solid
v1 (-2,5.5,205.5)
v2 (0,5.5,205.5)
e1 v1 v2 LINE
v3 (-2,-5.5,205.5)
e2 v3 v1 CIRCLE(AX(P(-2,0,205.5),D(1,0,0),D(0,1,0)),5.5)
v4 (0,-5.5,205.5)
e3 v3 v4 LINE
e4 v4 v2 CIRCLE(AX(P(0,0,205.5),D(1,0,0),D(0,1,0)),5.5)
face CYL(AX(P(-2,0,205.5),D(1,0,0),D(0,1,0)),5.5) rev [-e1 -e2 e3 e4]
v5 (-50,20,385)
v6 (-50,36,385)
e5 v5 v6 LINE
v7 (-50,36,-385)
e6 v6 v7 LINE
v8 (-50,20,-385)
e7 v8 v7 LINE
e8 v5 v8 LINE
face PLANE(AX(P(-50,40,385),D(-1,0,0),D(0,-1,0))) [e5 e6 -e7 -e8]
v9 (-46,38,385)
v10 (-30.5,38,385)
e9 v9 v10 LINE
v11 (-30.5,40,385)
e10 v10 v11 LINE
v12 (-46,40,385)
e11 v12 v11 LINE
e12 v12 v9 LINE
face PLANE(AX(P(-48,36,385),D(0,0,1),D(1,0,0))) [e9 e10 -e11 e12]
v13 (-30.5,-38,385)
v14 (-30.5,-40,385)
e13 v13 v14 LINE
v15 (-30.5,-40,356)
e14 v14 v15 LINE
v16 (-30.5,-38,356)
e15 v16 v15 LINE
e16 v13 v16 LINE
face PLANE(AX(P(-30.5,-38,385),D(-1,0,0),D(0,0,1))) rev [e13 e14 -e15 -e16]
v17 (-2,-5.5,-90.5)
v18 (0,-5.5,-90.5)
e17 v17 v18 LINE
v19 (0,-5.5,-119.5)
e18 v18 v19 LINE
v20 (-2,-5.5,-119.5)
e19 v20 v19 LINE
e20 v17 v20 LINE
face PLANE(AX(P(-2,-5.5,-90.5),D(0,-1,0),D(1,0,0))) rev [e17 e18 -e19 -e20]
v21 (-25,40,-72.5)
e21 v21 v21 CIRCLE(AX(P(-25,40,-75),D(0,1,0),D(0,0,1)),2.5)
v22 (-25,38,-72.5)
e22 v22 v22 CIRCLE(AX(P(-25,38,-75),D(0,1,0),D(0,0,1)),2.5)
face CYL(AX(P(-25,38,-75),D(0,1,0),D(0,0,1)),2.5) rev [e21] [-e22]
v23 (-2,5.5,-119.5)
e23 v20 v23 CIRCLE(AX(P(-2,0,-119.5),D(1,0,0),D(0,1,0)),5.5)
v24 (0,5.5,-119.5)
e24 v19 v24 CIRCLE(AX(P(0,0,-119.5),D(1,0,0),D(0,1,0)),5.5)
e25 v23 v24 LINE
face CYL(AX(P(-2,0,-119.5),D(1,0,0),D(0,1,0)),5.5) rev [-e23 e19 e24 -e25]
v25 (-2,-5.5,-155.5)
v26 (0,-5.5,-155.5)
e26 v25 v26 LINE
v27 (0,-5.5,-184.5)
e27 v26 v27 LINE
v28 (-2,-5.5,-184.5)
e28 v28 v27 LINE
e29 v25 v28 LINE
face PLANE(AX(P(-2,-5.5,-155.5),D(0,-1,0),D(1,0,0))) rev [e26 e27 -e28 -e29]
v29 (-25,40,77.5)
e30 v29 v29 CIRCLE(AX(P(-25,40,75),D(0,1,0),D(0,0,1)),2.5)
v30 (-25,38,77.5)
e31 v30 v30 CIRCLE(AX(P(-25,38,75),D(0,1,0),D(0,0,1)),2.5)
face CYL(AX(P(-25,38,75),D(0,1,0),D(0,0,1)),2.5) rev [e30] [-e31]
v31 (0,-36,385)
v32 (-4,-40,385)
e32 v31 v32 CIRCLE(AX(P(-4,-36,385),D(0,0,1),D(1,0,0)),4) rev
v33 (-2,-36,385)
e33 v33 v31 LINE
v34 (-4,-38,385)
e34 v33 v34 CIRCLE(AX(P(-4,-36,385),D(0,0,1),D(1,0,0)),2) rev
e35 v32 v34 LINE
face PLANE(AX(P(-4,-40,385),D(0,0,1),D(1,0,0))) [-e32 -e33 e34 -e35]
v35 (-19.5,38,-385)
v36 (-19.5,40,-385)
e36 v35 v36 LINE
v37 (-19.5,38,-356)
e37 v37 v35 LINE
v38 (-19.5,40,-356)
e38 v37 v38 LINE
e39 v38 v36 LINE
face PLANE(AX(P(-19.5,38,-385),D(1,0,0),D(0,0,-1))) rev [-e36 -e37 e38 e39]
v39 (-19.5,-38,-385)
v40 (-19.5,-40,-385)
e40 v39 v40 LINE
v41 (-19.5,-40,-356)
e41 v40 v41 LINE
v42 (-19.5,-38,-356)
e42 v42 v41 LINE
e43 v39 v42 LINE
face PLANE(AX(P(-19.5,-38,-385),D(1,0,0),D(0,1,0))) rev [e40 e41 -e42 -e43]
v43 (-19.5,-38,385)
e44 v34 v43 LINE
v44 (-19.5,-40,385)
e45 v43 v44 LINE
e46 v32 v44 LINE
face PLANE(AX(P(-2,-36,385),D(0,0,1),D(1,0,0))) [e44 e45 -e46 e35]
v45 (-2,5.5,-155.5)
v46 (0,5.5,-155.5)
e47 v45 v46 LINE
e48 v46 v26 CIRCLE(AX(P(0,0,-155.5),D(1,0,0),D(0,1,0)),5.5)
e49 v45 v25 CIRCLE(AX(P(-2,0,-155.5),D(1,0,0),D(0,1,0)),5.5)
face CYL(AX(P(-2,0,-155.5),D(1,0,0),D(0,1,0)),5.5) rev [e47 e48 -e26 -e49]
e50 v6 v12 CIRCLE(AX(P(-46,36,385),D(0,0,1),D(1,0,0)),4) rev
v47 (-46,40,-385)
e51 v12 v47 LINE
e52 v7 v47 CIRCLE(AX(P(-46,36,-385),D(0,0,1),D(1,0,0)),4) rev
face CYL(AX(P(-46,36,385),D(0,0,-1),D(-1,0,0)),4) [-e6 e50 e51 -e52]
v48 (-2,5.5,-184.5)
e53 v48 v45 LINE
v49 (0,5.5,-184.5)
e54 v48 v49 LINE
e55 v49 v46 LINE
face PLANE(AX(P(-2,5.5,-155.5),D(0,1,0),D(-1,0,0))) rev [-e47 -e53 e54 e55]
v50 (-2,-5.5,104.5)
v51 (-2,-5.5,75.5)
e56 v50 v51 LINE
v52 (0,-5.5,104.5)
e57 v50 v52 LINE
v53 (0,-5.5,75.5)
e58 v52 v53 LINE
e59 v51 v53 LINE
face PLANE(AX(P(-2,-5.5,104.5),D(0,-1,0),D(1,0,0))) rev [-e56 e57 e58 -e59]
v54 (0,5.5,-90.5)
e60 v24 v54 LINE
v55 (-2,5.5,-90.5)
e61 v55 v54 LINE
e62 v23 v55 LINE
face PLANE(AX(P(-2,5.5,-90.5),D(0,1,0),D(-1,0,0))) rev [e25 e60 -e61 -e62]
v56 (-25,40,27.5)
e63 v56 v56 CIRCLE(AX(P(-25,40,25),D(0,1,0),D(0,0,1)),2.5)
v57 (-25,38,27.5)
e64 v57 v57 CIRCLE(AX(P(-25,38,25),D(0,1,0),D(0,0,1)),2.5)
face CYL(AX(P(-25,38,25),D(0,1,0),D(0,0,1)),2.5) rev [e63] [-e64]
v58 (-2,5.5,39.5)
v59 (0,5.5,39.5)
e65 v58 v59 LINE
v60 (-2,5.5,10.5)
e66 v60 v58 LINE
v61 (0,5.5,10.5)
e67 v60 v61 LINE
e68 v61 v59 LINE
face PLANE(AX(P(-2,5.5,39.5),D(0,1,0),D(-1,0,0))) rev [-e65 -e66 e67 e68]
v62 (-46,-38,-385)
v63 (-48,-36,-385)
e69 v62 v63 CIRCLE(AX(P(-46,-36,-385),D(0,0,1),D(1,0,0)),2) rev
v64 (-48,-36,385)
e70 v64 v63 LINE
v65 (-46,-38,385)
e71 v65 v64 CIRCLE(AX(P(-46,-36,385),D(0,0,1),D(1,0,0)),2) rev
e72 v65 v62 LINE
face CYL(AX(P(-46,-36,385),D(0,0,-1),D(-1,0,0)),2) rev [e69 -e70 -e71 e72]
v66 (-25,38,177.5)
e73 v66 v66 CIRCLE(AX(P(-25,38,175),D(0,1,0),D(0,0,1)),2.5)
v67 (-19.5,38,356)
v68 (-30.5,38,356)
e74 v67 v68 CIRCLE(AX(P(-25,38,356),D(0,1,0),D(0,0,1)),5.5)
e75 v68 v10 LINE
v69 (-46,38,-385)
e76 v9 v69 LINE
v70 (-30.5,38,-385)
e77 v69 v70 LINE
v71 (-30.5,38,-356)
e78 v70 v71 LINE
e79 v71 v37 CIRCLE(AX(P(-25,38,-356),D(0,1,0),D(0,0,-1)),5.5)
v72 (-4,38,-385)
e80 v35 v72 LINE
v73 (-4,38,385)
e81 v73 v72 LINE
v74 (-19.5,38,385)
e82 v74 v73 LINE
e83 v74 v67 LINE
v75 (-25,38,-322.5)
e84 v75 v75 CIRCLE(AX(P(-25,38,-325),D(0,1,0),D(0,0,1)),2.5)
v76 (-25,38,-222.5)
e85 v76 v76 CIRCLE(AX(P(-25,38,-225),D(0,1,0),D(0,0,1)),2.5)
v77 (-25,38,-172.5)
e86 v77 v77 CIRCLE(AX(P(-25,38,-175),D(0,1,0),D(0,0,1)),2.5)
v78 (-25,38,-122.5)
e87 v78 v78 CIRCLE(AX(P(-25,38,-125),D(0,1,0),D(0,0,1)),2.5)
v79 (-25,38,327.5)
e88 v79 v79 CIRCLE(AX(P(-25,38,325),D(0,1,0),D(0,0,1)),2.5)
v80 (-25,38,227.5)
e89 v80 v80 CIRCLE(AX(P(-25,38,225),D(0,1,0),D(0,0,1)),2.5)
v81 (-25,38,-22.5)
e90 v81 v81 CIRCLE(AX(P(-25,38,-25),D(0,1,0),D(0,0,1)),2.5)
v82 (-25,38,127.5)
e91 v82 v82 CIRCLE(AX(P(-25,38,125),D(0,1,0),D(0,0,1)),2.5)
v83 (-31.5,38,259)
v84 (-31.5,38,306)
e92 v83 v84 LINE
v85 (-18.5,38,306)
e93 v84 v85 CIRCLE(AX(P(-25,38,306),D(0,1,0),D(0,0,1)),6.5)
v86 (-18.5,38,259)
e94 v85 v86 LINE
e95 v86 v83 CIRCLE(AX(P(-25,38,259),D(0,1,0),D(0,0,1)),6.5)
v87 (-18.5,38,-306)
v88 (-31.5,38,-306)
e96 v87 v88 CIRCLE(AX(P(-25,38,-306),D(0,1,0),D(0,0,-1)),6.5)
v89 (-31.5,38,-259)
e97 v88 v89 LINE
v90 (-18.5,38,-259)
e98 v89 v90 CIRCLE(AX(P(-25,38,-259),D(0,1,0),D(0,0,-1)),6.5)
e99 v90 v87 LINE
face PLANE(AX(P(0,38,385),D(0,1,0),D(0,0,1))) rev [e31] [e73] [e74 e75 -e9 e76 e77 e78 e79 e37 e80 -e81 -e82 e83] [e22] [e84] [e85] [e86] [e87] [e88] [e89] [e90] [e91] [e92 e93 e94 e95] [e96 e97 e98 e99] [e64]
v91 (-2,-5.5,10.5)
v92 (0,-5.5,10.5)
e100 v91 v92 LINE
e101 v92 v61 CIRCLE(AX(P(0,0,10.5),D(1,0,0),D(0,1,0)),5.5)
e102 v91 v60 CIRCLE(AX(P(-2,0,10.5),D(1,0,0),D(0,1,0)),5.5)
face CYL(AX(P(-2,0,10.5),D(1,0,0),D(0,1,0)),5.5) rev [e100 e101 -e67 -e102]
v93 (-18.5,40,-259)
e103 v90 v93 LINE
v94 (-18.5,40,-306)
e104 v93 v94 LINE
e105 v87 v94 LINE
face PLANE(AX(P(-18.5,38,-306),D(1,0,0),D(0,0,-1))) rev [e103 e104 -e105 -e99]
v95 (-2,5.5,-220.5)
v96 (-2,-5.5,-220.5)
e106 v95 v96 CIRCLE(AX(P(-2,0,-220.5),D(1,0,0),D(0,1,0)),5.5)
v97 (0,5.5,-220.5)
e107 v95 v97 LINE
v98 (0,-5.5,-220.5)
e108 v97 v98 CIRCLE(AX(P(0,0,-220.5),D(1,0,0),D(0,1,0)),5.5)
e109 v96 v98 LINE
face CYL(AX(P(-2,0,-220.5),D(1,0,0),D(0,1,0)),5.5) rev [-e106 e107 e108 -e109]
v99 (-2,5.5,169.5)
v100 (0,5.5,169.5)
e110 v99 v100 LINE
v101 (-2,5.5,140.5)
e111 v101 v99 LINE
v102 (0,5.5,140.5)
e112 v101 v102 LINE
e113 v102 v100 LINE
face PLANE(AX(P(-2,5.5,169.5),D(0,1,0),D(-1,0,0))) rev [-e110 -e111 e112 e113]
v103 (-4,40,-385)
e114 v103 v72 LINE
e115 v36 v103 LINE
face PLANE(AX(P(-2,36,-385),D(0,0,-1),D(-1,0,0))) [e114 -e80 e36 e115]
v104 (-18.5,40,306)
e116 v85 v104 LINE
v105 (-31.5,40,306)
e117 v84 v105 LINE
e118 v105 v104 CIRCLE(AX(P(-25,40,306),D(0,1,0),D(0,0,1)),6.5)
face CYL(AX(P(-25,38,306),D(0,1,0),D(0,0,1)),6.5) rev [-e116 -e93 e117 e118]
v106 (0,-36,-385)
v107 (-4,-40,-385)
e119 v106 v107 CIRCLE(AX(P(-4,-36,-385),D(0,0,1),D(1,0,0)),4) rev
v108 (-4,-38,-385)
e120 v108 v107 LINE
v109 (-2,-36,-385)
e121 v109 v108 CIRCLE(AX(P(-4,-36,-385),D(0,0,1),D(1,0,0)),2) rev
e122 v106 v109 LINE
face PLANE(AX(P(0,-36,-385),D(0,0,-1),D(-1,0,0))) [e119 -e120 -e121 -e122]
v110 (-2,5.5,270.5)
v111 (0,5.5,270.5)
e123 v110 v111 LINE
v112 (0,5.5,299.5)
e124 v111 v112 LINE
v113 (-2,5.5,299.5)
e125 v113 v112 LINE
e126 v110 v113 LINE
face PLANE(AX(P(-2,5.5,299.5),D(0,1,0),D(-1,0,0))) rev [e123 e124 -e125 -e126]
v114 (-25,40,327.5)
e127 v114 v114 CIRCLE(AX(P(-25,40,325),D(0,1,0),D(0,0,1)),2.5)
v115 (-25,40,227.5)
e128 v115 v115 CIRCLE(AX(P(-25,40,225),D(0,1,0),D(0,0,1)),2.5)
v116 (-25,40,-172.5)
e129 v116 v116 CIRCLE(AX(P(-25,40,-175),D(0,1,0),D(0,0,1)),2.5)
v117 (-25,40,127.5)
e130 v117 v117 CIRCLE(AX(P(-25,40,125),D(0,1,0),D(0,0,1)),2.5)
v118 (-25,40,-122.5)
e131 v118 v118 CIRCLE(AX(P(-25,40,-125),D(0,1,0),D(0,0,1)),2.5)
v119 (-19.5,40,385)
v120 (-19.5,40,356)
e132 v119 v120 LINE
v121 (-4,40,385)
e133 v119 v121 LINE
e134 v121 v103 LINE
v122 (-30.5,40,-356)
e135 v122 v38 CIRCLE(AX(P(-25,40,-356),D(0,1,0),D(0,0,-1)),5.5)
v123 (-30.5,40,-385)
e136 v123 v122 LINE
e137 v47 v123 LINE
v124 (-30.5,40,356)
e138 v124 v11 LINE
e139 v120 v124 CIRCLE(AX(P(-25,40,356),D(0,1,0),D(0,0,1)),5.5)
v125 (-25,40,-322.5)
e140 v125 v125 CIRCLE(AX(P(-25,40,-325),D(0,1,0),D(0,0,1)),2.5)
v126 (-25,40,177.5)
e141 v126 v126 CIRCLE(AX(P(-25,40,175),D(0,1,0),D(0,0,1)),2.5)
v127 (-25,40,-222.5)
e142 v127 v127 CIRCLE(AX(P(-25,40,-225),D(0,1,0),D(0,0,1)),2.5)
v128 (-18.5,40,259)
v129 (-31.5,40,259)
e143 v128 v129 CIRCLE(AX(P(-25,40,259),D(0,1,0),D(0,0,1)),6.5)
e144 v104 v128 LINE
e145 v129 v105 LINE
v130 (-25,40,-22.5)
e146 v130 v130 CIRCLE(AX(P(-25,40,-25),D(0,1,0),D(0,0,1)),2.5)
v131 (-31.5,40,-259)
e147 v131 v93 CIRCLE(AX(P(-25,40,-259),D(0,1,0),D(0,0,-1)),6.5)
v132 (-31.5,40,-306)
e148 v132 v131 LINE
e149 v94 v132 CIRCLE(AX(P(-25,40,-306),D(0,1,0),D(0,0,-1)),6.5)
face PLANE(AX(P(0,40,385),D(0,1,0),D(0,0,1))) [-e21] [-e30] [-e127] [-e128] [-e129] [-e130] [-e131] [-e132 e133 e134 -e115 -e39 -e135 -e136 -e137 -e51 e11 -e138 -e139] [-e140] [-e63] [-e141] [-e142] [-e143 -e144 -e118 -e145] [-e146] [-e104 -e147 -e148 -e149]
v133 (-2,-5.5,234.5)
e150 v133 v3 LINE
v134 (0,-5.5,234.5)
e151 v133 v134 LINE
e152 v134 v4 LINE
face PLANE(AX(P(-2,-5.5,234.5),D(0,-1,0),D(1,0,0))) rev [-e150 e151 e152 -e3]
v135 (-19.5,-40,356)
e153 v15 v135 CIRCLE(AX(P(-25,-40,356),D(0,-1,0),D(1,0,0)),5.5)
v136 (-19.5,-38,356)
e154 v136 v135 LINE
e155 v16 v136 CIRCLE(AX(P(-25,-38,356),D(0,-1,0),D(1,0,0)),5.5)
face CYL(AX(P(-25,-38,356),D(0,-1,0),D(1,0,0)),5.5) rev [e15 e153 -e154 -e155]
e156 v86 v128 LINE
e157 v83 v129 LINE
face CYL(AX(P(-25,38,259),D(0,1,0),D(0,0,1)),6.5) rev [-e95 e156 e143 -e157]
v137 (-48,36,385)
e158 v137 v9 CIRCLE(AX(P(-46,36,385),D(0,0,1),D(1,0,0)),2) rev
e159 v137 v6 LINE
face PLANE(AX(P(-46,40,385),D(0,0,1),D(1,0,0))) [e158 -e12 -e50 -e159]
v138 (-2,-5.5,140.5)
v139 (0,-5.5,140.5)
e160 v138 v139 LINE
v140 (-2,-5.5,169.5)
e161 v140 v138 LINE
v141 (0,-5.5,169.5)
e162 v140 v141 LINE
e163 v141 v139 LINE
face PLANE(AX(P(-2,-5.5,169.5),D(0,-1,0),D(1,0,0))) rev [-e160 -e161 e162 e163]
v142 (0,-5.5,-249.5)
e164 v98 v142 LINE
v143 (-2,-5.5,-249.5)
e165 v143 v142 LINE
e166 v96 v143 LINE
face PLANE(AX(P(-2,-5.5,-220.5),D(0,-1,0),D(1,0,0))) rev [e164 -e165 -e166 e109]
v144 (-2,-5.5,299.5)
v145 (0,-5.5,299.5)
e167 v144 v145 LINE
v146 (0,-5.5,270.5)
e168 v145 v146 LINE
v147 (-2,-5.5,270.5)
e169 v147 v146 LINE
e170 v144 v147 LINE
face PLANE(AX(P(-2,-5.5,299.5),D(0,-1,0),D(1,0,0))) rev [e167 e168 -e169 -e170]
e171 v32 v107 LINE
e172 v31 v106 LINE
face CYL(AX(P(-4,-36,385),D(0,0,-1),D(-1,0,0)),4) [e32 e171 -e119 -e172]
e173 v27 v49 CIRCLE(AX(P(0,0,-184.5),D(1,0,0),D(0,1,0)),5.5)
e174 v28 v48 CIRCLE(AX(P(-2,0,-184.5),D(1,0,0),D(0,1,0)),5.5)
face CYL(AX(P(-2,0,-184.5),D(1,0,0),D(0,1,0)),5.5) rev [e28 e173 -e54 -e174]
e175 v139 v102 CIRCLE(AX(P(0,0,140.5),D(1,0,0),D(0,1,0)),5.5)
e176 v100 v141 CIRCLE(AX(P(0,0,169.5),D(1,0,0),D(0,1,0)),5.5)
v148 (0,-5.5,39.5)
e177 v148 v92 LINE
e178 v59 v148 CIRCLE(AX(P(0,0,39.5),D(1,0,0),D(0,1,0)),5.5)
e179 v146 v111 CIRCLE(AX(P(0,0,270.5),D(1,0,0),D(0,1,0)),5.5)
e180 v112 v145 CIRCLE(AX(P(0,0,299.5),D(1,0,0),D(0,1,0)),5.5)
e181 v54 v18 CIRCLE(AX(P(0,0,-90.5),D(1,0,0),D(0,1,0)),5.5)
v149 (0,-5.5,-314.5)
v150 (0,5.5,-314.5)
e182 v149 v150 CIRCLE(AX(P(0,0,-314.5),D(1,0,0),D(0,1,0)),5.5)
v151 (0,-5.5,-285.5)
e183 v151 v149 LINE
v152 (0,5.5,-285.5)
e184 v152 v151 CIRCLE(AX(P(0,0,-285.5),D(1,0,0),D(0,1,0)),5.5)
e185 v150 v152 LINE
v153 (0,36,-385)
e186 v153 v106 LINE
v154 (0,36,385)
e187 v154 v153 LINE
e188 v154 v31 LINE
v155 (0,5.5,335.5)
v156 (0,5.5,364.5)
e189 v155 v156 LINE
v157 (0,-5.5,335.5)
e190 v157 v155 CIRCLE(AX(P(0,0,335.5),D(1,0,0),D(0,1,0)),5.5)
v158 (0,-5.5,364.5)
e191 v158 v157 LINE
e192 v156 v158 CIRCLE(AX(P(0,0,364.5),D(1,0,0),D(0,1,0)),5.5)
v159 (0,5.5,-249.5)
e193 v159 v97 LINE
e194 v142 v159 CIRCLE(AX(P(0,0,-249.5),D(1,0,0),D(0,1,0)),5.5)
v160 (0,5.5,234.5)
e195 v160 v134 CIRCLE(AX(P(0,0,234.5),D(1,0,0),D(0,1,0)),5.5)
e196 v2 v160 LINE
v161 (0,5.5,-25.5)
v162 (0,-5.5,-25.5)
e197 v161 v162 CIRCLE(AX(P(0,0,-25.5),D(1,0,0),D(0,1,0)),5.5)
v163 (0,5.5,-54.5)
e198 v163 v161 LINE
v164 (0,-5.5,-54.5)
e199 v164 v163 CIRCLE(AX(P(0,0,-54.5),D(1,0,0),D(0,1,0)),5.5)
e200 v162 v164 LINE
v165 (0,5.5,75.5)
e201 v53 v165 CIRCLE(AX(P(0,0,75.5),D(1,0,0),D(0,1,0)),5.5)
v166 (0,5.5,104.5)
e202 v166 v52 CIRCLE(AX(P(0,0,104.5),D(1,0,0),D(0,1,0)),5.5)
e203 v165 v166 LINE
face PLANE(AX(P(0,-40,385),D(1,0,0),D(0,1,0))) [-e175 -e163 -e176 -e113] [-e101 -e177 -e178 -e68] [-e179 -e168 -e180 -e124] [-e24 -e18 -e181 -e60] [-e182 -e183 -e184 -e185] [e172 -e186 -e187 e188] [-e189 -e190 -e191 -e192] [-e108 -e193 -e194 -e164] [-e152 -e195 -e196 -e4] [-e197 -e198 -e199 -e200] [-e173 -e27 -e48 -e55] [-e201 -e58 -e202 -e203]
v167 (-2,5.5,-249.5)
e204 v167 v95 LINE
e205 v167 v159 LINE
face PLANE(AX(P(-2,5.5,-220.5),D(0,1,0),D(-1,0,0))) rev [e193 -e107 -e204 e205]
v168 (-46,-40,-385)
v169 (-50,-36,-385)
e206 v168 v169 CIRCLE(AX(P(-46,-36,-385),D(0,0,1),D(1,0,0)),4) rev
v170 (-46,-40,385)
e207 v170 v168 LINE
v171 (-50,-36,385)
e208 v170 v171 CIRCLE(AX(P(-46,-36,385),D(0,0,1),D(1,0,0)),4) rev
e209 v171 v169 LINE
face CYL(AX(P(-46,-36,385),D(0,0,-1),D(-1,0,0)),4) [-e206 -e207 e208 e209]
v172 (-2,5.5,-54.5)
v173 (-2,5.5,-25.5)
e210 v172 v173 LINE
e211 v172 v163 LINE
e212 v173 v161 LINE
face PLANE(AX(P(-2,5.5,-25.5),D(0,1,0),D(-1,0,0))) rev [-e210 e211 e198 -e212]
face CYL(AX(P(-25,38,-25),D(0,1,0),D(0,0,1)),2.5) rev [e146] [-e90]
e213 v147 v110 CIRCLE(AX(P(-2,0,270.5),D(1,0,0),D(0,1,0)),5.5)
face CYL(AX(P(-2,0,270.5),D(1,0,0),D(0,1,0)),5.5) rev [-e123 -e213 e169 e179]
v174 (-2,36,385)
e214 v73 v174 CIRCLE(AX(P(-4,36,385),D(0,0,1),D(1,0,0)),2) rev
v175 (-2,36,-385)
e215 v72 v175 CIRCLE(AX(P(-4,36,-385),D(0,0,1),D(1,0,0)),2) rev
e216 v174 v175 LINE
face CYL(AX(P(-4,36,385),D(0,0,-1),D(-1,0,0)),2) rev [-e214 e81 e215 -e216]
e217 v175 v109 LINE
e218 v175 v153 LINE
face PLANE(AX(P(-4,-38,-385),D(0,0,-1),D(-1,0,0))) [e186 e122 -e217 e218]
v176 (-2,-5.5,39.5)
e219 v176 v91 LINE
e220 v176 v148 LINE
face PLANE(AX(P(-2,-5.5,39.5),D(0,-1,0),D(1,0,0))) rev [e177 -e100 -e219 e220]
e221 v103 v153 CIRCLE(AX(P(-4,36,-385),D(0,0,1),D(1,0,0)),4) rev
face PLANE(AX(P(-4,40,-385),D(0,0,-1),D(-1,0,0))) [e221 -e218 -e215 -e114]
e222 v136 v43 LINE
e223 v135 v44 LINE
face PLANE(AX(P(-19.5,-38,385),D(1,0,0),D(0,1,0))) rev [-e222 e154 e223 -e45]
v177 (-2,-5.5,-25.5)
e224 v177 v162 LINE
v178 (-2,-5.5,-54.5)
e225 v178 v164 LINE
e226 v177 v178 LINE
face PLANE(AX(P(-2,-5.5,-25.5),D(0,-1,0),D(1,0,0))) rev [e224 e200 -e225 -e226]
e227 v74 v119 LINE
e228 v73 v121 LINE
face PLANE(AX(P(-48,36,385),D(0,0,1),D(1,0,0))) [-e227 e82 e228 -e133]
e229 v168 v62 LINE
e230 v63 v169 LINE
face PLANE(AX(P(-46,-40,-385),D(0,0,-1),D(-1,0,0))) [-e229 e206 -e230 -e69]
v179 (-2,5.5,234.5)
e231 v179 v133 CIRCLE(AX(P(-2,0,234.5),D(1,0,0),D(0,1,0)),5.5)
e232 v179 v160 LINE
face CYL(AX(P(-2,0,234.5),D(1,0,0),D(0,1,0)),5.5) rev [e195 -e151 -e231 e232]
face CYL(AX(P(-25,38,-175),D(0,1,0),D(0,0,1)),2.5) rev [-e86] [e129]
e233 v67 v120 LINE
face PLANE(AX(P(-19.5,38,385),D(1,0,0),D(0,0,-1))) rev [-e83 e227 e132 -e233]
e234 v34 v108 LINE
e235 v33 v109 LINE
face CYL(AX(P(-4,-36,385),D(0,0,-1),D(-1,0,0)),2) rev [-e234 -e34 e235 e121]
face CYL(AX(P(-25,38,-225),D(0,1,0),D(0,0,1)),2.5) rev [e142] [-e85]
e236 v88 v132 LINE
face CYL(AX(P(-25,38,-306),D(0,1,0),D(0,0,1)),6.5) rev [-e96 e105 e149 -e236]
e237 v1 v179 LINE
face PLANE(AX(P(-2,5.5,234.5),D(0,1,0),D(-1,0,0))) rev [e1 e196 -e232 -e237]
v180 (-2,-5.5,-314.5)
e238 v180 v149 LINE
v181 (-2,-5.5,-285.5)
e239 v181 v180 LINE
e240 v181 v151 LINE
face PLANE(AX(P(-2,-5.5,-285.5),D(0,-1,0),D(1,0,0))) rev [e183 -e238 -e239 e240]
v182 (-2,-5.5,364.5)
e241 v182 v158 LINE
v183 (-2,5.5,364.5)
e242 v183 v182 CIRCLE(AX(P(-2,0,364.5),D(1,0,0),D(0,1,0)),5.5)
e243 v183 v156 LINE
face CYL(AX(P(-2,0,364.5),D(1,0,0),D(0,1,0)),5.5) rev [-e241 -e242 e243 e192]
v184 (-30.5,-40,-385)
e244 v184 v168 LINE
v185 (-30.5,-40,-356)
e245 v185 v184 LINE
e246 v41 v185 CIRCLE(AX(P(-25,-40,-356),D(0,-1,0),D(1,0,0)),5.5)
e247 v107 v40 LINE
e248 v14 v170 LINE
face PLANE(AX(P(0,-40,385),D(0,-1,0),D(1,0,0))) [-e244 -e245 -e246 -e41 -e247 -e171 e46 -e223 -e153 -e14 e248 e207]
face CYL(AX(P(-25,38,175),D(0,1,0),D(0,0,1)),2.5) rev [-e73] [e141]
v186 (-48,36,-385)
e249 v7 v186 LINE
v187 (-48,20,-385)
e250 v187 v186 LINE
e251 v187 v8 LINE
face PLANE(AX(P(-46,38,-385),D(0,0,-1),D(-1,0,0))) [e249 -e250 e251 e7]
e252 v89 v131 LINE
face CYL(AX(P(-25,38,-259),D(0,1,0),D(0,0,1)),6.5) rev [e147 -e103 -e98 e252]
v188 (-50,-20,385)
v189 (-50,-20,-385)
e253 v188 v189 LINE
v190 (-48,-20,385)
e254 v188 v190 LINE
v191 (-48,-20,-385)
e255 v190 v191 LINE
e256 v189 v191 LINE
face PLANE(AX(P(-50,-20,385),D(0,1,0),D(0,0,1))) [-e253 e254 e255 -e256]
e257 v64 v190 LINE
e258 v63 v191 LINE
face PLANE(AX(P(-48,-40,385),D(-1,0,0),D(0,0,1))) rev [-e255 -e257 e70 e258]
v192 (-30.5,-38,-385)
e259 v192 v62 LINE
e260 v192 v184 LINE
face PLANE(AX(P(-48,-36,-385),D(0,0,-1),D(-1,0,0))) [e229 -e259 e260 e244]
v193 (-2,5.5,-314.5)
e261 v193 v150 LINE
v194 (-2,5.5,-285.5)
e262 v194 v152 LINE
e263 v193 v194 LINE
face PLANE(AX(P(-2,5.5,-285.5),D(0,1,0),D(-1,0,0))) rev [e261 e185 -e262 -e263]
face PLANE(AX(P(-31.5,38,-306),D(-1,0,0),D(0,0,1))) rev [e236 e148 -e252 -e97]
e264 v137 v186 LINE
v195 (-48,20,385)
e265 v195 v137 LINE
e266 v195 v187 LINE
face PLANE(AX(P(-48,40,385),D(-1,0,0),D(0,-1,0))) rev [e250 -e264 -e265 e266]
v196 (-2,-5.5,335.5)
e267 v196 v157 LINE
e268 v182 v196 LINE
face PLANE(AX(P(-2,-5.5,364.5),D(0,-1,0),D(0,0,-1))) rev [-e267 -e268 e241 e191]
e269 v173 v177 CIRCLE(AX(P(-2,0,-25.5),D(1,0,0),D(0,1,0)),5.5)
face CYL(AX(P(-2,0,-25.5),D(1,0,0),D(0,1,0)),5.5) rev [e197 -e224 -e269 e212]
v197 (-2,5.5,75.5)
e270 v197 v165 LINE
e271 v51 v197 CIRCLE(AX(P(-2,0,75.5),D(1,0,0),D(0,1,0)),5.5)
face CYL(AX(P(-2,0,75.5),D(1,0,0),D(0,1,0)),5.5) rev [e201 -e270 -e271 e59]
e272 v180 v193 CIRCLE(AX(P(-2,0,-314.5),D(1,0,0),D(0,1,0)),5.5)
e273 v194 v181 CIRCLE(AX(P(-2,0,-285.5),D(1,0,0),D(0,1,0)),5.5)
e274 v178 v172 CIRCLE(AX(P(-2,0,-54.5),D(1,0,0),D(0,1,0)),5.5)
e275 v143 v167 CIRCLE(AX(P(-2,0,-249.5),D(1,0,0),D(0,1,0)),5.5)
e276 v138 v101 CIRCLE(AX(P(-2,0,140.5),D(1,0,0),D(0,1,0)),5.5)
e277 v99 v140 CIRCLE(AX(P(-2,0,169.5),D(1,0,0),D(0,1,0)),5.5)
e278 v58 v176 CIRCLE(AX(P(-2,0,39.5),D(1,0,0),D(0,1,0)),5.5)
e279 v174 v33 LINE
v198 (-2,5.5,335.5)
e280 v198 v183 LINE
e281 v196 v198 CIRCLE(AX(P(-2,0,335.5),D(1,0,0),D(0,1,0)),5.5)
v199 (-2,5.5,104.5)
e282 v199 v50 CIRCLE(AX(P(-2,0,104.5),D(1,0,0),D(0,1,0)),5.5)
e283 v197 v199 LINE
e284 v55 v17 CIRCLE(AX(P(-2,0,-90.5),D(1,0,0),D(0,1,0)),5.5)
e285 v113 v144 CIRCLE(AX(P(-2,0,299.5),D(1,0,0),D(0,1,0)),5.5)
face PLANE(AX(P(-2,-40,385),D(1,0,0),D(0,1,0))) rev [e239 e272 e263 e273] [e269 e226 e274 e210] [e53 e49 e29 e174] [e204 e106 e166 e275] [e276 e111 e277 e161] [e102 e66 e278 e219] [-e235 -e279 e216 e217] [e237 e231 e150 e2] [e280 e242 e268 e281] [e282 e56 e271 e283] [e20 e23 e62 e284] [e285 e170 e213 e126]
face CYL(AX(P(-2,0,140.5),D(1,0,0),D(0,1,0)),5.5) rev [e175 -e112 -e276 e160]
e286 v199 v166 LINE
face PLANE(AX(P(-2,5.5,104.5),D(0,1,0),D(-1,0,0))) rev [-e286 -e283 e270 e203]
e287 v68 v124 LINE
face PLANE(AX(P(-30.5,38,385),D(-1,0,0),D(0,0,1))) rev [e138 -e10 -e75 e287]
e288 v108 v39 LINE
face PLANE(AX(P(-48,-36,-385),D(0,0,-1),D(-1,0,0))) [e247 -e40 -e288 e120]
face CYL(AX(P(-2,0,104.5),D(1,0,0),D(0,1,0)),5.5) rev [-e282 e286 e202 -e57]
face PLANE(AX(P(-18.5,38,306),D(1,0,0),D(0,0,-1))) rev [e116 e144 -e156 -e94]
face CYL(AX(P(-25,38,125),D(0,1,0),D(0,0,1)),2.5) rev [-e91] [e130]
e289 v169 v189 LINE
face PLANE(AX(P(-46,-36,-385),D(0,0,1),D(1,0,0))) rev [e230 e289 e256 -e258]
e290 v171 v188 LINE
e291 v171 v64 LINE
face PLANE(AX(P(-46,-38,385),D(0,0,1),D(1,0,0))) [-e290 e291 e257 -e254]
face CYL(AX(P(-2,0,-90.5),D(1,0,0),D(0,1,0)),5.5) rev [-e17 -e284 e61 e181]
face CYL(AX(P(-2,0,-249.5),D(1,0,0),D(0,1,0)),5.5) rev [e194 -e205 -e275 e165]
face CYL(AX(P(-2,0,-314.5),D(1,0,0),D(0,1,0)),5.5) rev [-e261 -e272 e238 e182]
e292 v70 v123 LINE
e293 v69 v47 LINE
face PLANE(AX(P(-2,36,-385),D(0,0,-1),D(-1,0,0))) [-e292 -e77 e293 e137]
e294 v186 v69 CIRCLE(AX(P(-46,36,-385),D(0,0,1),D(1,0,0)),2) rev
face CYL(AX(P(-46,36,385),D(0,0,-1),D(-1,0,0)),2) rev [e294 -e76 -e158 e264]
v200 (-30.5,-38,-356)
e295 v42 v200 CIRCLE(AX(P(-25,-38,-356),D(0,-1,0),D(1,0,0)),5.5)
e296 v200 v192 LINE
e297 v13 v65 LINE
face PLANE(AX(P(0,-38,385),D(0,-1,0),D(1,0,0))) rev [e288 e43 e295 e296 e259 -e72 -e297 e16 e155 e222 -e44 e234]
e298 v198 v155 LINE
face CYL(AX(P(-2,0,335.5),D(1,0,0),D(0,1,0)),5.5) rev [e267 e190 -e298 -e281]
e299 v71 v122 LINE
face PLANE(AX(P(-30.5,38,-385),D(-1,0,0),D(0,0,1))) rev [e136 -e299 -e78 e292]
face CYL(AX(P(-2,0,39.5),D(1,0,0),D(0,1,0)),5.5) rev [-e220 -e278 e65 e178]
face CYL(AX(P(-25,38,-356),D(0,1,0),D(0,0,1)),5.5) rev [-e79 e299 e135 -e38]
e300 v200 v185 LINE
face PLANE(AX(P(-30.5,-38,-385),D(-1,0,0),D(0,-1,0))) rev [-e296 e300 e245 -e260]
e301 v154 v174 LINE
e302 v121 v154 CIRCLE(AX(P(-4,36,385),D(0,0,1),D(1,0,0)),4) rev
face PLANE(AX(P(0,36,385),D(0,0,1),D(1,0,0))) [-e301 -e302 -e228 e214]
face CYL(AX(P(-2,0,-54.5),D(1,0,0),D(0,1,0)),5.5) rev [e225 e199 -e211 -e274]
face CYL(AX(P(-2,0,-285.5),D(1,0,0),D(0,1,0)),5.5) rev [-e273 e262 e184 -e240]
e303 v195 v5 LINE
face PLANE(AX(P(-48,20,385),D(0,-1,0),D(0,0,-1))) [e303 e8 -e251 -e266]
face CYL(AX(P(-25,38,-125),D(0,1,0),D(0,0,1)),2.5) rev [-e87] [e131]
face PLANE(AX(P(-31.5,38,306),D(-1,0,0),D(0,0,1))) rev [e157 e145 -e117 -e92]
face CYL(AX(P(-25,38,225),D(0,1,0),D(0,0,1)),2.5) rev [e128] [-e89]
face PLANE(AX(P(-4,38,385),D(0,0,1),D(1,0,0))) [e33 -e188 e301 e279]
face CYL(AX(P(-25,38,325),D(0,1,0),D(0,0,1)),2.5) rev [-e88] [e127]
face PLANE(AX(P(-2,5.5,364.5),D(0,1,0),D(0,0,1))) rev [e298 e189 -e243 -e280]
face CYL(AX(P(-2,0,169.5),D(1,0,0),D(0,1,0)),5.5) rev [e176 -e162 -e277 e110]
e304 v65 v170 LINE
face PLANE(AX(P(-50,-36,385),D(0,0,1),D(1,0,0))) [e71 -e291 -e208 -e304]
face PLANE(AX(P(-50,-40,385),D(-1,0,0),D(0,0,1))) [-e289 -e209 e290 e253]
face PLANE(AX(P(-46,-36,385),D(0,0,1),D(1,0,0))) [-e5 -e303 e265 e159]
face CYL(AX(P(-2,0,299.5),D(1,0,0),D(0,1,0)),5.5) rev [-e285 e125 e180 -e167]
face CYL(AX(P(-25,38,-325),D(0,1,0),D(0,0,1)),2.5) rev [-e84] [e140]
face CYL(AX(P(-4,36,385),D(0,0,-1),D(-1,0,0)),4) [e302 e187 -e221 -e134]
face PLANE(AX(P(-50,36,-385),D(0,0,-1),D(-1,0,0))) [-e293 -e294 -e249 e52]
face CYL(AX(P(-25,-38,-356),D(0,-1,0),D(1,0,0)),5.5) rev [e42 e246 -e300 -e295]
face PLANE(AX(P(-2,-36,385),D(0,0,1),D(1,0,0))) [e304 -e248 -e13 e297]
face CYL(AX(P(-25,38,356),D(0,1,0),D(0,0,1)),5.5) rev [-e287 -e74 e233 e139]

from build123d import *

# Parameters (mm, degrees)
SM_BASE_FLANGE_1_DEPTH = 385
CUT_EXTRUDE_1_DEPTH    = 10
CUT_EXTRUDE_2_DEPTH    = 10
SKETCH_8_R             = 2.5
CUT_EXTRUDE_3_DEPTH    = 10
CUT_EXTRUDE_START      = -10
CUT_EXTRUDE_4_DEPTH    = 10


# Sheet-metal steps are written as plain solids
with BuildPart() as part:
    # Sketch 1 → Базовая кромка1 (new, symmetric)
    with BuildSketch(Plane.XY):
        with BuildLine():
            Line((-50, -20), (-50, -36))
            ThreePointArc((-50, -36), (-48.828427125, -38.828427125), (-46, -40))
            Line((-46, -40), (-4, -40))
            ThreePointArc((-4, -40), (-1.171572875, -38.828427125), (0, -36))
            Line((0, -36), (0, 36))
            ThreePointArc((0, 36), (-1.171572875, 38.828427125), (-4, 40))
            Line((-4, 40), (-46, 40))
            ThreePointArc((-46, 40), (-48.828427125, 38.828427125), (-50, 36))
            Line((-50, 36), (-50, 20))
            Line((-50, 20), (-48, 20))
            Line((-48, 20), (-48, 36))
            ThreePointArc((-48, 36), (-47.414213562, 37.414213562), (-46, 38))
            Line((-46, 38), (-4, 38))
            ThreePointArc((-4, 38), (-2.585786438, 37.414213562), (-2, 36))
            Line((-2, 36), (-2, -36))
            ThreePointArc((-2, -36), (-2.585786438, -37.414213562), (-4, -38))
            Line((-4, -38), (-46, -38))
            ThreePointArc((-46, -38), (-47.414213562, -37.414213562), (-48, -36))
            Line((-48, -36), (-48, -20))
            Line((-48, -20), (-50, -20))
        make_face()
    extrude(amount=SM_BASE_FLANGE_1_DEPTH, both=True)

    # Эскиз6 → Вырез-Вытянуть1 (cut)
    with BuildSketch(Plane(origin=(0, 0, 0), x_dir=(0, 0, -1), z_dir=(1, 0, 0))):
        with BuildLine():
            Line((-364.5, 5.5), (-335.5, 5.5))
            ThreePointArc((-335.5, 5.5), (-330, 0), (-335.5, -5.5))
            Line((-335.5, -5.5), (-364.5, -5.5))
            ThreePointArc((-364.5, -5.5), (-370, 0), (-364.5, 5.5))
        make_face()
        with BuildLine():
            Line((-299.5, 5.5), (-270.5, 5.5))
            ThreePointArc((-270.5, 5.5), (-265, 0), (-270.5, -5.5))
            Line((-270.5, -5.5), (-299.5, -5.5))
            ThreePointArc((-299.5, -5.5), (-305, 0), (-299.5, 5.5))
        make_face()
        with BuildLine():
            Line((-234.5, 5.5), (-205.5, 5.5))
            ThreePointArc((-205.5, 5.5), (-200, 0), (-205.5, -5.5))
            Line((-205.5, -5.5), (-234.5, -5.5))
            ThreePointArc((-234.5, -5.5), (-240, 0), (-234.5, 5.5))
        make_face()
        with BuildLine():
            Line((-169.5, 5.5), (-140.5, 5.5))
            ThreePointArc((-140.5, 5.5), (-135, 0), (-140.5, -5.5))
            Line((-140.5, -5.5), (-169.5, -5.5))
            ThreePointArc((-169.5, -5.5), (-175, 0), (-169.5, 5.5))
        make_face()
        with BuildLine():
            Line((-104.5, 5.5), (-75.5, 5.5))
            ThreePointArc((-75.5, 5.5), (-70, 0), (-75.5, -5.5))
            Line((-75.5, -5.5), (-104.5, -5.5))
            ThreePointArc((-104.5, -5.5), (-110, 0), (-104.5, 5.5))
        make_face()
        with BuildLine():
            Line((-39.5, 5.5), (-10.5, 5.5))
            ThreePointArc((-10.5, 5.5), (-5, 0), (-10.5, -5.5))
            Line((-10.5, -5.5), (-39.5, -5.5))
            ThreePointArc((-39.5, -5.5), (-45, 0), (-39.5, 5.5))
        make_face()
        with BuildLine():
            Line((25.5, 5.5), (54.5, 5.5))
            ThreePointArc((54.5, 5.5), (60, 0), (54.5, -5.5))
            Line((54.5, -5.5), (25.5, -5.5))
            ThreePointArc((25.5, -5.5), (20, 0), (25.5, 5.5))
        make_face()
        with BuildLine():
            Line((90.5, 5.5), (119.5, 5.5))
            ThreePointArc((119.5, 5.5), (125, 0), (119.5, -5.5))
            Line((119.5, -5.5), (90.5, -5.5))
            ThreePointArc((90.5, -5.5), (85, 0), (90.5, 5.5))
        make_face()
        with BuildLine():
            Line((155.5, 5.5), (184.5, 5.5))
            ThreePointArc((184.5, 5.5), (190, 0), (184.5, -5.5))
            Line((184.5, -5.5), (155.5, -5.5))
            ThreePointArc((155.5, -5.5), (150, 0), (155.5, 5.5))
        make_face()
        with BuildLine():
            Line((220.5, 5.5), (249.5, 5.5))
            ThreePointArc((249.5, 5.5), (255, 0), (249.5, -5.5))
            Line((249.5, -5.5), (220.5, -5.5))
            ThreePointArc((220.5, -5.5), (215, 0), (220.5, 5.5))
        make_face()
        with BuildLine():
            Line((285.5, 5.5), (314.5, 5.5))
            ThreePointArc((314.5, 5.5), (320, 0), (314.5, -5.5))
            Line((314.5, -5.5), (285.5, -5.5))
            ThreePointArc((285.5, -5.5), (280, 0), (285.5, 5.5))
        make_face()
    extrude(amount=-CUT_EXTRUDE_1_DEPTH, mode=Mode.SUBTRACT)

    # Эскиз7 → Вырез-Вытянуть2 (cut)
    with BuildSketch(Plane(origin=(0, 40, 0), x_dir=(1, 0, 0), z_dir=(0, 1, 0))):
        with BuildLine():
            Line((-30.5, -385), (-30.5, -356))
            ThreePointArc((-30.5, -356), (-25, -350.5), (-19.5, -356))
            Line((-19.5, -356), (-19.5, -385))
            ThreePointArc((-19.5, -385), (-25, -390.5), (-30.5, -385))
        make_face()
        with BuildLine():
            Line((-31.5, -306), (-31.5, -259))
            ThreePointArc((-31.5, -259), (-25, -252.5), (-18.5, -259))
            Line((-18.5, -259), (-18.5, -306))
            ThreePointArc((-18.5, -306), (-25, -312.5), (-31.5, -306))
        make_face()
        with BuildLine():
            Line((-30.5, 385), (-30.5, 356))
            ThreePointArc((-30.5, 356), (-25, 350.5), (-19.5, 356))
            Line((-19.5, 356), (-19.5, 385))
            ThreePointArc((-19.5, 385), (-25, 390.5), (-30.5, 385))
        make_face()
        with BuildLine():
            Line((-31.5, 306), (-31.5, 259))
            ThreePointArc((-31.5, 259), (-25, 252.5), (-18.5, 259))
            Line((-18.5, 259), (-18.5, 306))
            ThreePointArc((-18.5, 306), (-25, 312.5), (-31.5, 306))
        make_face()
    extrude(amount=-CUT_EXTRUDE_2_DEPTH, mode=Mode.SUBTRACT)

    # Эскиз8 → Вырез-Вытянуть3 (cut)
    with BuildSketch(Plane(origin=(0, 40, 0), x_dir=(1, 0, 0), z_dir=(0, 1, 0))):
        with Locations(Location((-25, -325, 0), (0, 0, 270))):
            Circle(SKETCH_8_R)
        with Locations((-25, -275)):
            Circle(SKETCH_8_R)
        with Locations(Location((-25, -225, 0), (0, 0, 270))):
            Circle(SKETCH_8_R)
        with Locations(Location((-25, -175, 0), (0, 0, 270))):
            Circle(SKETCH_8_R)
        with Locations(Location((-25, -125, 0), (0, 0, 270))):
            Circle(SKETCH_8_R)
        with Locations(Location((-25, -75, 0), (0, 0, 270))):
            Circle(SKETCH_8_R)
        with Locations(Location((-25, -25, 0), (0, 0, 270))):
            Circle(SKETCH_8_R)
        with Locations(Location((-25, 25, 0), (0, 0, 270))):
            Circle(SKETCH_8_R)
        with Locations(Location((-25, 75, 0), (0, 0, 270))):
            Circle(SKETCH_8_R)
        with Locations(Location((-25, 125, 0), (0, 0, 270))):
            Circle(SKETCH_8_R)
        with Locations(Location((-25, 175, 0), (0, 0, 270))):
            Circle(SKETCH_8_R)
        with Locations(Location((-25, 225, 0), (0, 0, 270))):
            Circle(SKETCH_8_R)
        with Locations((-25, 275)):
            Circle(SKETCH_8_R)
        with Locations(Location((-25, 325, 0), (0, 0, 270))):
            Circle(SKETCH_8_R)
    extrude(amount=-CUT_EXTRUDE_3_DEPTH, mode=Mode.SUBTRACT)

    # Эскиз9 → Вырез-Вытянуть4 (cut)
    with BuildSketch(Plane.XZ.offset(40).offset(CUT_EXTRUDE_START)):
        with BuildLine():
            Line((-19.5, 385), (-19.5, 356))
            ThreePointArc((-19.5, 356), (-25, 350.5), (-30.5, 356))
            Line((-30.5, 356), (-30.5, 385))
            ThreePointArc((-30.5, 385), (-25, 390.5), (-19.5, 385))
        make_face()
        with BuildLine():
            Line((-30.5, -385), (-30.5, -356))
            ThreePointArc((-30.5, -356), (-25, -350.5), (-19.5, -356))
            Line((-19.5, -356), (-19.5, -385))
            ThreePointArc((-19.5, -385), (-25, -390.5), (-30.5, -385))
        make_face()
    extrude(amount=CUT_EXTRUDE_4_DEPTH, mode=Mode.SUBTRACT)


solid = part.part
